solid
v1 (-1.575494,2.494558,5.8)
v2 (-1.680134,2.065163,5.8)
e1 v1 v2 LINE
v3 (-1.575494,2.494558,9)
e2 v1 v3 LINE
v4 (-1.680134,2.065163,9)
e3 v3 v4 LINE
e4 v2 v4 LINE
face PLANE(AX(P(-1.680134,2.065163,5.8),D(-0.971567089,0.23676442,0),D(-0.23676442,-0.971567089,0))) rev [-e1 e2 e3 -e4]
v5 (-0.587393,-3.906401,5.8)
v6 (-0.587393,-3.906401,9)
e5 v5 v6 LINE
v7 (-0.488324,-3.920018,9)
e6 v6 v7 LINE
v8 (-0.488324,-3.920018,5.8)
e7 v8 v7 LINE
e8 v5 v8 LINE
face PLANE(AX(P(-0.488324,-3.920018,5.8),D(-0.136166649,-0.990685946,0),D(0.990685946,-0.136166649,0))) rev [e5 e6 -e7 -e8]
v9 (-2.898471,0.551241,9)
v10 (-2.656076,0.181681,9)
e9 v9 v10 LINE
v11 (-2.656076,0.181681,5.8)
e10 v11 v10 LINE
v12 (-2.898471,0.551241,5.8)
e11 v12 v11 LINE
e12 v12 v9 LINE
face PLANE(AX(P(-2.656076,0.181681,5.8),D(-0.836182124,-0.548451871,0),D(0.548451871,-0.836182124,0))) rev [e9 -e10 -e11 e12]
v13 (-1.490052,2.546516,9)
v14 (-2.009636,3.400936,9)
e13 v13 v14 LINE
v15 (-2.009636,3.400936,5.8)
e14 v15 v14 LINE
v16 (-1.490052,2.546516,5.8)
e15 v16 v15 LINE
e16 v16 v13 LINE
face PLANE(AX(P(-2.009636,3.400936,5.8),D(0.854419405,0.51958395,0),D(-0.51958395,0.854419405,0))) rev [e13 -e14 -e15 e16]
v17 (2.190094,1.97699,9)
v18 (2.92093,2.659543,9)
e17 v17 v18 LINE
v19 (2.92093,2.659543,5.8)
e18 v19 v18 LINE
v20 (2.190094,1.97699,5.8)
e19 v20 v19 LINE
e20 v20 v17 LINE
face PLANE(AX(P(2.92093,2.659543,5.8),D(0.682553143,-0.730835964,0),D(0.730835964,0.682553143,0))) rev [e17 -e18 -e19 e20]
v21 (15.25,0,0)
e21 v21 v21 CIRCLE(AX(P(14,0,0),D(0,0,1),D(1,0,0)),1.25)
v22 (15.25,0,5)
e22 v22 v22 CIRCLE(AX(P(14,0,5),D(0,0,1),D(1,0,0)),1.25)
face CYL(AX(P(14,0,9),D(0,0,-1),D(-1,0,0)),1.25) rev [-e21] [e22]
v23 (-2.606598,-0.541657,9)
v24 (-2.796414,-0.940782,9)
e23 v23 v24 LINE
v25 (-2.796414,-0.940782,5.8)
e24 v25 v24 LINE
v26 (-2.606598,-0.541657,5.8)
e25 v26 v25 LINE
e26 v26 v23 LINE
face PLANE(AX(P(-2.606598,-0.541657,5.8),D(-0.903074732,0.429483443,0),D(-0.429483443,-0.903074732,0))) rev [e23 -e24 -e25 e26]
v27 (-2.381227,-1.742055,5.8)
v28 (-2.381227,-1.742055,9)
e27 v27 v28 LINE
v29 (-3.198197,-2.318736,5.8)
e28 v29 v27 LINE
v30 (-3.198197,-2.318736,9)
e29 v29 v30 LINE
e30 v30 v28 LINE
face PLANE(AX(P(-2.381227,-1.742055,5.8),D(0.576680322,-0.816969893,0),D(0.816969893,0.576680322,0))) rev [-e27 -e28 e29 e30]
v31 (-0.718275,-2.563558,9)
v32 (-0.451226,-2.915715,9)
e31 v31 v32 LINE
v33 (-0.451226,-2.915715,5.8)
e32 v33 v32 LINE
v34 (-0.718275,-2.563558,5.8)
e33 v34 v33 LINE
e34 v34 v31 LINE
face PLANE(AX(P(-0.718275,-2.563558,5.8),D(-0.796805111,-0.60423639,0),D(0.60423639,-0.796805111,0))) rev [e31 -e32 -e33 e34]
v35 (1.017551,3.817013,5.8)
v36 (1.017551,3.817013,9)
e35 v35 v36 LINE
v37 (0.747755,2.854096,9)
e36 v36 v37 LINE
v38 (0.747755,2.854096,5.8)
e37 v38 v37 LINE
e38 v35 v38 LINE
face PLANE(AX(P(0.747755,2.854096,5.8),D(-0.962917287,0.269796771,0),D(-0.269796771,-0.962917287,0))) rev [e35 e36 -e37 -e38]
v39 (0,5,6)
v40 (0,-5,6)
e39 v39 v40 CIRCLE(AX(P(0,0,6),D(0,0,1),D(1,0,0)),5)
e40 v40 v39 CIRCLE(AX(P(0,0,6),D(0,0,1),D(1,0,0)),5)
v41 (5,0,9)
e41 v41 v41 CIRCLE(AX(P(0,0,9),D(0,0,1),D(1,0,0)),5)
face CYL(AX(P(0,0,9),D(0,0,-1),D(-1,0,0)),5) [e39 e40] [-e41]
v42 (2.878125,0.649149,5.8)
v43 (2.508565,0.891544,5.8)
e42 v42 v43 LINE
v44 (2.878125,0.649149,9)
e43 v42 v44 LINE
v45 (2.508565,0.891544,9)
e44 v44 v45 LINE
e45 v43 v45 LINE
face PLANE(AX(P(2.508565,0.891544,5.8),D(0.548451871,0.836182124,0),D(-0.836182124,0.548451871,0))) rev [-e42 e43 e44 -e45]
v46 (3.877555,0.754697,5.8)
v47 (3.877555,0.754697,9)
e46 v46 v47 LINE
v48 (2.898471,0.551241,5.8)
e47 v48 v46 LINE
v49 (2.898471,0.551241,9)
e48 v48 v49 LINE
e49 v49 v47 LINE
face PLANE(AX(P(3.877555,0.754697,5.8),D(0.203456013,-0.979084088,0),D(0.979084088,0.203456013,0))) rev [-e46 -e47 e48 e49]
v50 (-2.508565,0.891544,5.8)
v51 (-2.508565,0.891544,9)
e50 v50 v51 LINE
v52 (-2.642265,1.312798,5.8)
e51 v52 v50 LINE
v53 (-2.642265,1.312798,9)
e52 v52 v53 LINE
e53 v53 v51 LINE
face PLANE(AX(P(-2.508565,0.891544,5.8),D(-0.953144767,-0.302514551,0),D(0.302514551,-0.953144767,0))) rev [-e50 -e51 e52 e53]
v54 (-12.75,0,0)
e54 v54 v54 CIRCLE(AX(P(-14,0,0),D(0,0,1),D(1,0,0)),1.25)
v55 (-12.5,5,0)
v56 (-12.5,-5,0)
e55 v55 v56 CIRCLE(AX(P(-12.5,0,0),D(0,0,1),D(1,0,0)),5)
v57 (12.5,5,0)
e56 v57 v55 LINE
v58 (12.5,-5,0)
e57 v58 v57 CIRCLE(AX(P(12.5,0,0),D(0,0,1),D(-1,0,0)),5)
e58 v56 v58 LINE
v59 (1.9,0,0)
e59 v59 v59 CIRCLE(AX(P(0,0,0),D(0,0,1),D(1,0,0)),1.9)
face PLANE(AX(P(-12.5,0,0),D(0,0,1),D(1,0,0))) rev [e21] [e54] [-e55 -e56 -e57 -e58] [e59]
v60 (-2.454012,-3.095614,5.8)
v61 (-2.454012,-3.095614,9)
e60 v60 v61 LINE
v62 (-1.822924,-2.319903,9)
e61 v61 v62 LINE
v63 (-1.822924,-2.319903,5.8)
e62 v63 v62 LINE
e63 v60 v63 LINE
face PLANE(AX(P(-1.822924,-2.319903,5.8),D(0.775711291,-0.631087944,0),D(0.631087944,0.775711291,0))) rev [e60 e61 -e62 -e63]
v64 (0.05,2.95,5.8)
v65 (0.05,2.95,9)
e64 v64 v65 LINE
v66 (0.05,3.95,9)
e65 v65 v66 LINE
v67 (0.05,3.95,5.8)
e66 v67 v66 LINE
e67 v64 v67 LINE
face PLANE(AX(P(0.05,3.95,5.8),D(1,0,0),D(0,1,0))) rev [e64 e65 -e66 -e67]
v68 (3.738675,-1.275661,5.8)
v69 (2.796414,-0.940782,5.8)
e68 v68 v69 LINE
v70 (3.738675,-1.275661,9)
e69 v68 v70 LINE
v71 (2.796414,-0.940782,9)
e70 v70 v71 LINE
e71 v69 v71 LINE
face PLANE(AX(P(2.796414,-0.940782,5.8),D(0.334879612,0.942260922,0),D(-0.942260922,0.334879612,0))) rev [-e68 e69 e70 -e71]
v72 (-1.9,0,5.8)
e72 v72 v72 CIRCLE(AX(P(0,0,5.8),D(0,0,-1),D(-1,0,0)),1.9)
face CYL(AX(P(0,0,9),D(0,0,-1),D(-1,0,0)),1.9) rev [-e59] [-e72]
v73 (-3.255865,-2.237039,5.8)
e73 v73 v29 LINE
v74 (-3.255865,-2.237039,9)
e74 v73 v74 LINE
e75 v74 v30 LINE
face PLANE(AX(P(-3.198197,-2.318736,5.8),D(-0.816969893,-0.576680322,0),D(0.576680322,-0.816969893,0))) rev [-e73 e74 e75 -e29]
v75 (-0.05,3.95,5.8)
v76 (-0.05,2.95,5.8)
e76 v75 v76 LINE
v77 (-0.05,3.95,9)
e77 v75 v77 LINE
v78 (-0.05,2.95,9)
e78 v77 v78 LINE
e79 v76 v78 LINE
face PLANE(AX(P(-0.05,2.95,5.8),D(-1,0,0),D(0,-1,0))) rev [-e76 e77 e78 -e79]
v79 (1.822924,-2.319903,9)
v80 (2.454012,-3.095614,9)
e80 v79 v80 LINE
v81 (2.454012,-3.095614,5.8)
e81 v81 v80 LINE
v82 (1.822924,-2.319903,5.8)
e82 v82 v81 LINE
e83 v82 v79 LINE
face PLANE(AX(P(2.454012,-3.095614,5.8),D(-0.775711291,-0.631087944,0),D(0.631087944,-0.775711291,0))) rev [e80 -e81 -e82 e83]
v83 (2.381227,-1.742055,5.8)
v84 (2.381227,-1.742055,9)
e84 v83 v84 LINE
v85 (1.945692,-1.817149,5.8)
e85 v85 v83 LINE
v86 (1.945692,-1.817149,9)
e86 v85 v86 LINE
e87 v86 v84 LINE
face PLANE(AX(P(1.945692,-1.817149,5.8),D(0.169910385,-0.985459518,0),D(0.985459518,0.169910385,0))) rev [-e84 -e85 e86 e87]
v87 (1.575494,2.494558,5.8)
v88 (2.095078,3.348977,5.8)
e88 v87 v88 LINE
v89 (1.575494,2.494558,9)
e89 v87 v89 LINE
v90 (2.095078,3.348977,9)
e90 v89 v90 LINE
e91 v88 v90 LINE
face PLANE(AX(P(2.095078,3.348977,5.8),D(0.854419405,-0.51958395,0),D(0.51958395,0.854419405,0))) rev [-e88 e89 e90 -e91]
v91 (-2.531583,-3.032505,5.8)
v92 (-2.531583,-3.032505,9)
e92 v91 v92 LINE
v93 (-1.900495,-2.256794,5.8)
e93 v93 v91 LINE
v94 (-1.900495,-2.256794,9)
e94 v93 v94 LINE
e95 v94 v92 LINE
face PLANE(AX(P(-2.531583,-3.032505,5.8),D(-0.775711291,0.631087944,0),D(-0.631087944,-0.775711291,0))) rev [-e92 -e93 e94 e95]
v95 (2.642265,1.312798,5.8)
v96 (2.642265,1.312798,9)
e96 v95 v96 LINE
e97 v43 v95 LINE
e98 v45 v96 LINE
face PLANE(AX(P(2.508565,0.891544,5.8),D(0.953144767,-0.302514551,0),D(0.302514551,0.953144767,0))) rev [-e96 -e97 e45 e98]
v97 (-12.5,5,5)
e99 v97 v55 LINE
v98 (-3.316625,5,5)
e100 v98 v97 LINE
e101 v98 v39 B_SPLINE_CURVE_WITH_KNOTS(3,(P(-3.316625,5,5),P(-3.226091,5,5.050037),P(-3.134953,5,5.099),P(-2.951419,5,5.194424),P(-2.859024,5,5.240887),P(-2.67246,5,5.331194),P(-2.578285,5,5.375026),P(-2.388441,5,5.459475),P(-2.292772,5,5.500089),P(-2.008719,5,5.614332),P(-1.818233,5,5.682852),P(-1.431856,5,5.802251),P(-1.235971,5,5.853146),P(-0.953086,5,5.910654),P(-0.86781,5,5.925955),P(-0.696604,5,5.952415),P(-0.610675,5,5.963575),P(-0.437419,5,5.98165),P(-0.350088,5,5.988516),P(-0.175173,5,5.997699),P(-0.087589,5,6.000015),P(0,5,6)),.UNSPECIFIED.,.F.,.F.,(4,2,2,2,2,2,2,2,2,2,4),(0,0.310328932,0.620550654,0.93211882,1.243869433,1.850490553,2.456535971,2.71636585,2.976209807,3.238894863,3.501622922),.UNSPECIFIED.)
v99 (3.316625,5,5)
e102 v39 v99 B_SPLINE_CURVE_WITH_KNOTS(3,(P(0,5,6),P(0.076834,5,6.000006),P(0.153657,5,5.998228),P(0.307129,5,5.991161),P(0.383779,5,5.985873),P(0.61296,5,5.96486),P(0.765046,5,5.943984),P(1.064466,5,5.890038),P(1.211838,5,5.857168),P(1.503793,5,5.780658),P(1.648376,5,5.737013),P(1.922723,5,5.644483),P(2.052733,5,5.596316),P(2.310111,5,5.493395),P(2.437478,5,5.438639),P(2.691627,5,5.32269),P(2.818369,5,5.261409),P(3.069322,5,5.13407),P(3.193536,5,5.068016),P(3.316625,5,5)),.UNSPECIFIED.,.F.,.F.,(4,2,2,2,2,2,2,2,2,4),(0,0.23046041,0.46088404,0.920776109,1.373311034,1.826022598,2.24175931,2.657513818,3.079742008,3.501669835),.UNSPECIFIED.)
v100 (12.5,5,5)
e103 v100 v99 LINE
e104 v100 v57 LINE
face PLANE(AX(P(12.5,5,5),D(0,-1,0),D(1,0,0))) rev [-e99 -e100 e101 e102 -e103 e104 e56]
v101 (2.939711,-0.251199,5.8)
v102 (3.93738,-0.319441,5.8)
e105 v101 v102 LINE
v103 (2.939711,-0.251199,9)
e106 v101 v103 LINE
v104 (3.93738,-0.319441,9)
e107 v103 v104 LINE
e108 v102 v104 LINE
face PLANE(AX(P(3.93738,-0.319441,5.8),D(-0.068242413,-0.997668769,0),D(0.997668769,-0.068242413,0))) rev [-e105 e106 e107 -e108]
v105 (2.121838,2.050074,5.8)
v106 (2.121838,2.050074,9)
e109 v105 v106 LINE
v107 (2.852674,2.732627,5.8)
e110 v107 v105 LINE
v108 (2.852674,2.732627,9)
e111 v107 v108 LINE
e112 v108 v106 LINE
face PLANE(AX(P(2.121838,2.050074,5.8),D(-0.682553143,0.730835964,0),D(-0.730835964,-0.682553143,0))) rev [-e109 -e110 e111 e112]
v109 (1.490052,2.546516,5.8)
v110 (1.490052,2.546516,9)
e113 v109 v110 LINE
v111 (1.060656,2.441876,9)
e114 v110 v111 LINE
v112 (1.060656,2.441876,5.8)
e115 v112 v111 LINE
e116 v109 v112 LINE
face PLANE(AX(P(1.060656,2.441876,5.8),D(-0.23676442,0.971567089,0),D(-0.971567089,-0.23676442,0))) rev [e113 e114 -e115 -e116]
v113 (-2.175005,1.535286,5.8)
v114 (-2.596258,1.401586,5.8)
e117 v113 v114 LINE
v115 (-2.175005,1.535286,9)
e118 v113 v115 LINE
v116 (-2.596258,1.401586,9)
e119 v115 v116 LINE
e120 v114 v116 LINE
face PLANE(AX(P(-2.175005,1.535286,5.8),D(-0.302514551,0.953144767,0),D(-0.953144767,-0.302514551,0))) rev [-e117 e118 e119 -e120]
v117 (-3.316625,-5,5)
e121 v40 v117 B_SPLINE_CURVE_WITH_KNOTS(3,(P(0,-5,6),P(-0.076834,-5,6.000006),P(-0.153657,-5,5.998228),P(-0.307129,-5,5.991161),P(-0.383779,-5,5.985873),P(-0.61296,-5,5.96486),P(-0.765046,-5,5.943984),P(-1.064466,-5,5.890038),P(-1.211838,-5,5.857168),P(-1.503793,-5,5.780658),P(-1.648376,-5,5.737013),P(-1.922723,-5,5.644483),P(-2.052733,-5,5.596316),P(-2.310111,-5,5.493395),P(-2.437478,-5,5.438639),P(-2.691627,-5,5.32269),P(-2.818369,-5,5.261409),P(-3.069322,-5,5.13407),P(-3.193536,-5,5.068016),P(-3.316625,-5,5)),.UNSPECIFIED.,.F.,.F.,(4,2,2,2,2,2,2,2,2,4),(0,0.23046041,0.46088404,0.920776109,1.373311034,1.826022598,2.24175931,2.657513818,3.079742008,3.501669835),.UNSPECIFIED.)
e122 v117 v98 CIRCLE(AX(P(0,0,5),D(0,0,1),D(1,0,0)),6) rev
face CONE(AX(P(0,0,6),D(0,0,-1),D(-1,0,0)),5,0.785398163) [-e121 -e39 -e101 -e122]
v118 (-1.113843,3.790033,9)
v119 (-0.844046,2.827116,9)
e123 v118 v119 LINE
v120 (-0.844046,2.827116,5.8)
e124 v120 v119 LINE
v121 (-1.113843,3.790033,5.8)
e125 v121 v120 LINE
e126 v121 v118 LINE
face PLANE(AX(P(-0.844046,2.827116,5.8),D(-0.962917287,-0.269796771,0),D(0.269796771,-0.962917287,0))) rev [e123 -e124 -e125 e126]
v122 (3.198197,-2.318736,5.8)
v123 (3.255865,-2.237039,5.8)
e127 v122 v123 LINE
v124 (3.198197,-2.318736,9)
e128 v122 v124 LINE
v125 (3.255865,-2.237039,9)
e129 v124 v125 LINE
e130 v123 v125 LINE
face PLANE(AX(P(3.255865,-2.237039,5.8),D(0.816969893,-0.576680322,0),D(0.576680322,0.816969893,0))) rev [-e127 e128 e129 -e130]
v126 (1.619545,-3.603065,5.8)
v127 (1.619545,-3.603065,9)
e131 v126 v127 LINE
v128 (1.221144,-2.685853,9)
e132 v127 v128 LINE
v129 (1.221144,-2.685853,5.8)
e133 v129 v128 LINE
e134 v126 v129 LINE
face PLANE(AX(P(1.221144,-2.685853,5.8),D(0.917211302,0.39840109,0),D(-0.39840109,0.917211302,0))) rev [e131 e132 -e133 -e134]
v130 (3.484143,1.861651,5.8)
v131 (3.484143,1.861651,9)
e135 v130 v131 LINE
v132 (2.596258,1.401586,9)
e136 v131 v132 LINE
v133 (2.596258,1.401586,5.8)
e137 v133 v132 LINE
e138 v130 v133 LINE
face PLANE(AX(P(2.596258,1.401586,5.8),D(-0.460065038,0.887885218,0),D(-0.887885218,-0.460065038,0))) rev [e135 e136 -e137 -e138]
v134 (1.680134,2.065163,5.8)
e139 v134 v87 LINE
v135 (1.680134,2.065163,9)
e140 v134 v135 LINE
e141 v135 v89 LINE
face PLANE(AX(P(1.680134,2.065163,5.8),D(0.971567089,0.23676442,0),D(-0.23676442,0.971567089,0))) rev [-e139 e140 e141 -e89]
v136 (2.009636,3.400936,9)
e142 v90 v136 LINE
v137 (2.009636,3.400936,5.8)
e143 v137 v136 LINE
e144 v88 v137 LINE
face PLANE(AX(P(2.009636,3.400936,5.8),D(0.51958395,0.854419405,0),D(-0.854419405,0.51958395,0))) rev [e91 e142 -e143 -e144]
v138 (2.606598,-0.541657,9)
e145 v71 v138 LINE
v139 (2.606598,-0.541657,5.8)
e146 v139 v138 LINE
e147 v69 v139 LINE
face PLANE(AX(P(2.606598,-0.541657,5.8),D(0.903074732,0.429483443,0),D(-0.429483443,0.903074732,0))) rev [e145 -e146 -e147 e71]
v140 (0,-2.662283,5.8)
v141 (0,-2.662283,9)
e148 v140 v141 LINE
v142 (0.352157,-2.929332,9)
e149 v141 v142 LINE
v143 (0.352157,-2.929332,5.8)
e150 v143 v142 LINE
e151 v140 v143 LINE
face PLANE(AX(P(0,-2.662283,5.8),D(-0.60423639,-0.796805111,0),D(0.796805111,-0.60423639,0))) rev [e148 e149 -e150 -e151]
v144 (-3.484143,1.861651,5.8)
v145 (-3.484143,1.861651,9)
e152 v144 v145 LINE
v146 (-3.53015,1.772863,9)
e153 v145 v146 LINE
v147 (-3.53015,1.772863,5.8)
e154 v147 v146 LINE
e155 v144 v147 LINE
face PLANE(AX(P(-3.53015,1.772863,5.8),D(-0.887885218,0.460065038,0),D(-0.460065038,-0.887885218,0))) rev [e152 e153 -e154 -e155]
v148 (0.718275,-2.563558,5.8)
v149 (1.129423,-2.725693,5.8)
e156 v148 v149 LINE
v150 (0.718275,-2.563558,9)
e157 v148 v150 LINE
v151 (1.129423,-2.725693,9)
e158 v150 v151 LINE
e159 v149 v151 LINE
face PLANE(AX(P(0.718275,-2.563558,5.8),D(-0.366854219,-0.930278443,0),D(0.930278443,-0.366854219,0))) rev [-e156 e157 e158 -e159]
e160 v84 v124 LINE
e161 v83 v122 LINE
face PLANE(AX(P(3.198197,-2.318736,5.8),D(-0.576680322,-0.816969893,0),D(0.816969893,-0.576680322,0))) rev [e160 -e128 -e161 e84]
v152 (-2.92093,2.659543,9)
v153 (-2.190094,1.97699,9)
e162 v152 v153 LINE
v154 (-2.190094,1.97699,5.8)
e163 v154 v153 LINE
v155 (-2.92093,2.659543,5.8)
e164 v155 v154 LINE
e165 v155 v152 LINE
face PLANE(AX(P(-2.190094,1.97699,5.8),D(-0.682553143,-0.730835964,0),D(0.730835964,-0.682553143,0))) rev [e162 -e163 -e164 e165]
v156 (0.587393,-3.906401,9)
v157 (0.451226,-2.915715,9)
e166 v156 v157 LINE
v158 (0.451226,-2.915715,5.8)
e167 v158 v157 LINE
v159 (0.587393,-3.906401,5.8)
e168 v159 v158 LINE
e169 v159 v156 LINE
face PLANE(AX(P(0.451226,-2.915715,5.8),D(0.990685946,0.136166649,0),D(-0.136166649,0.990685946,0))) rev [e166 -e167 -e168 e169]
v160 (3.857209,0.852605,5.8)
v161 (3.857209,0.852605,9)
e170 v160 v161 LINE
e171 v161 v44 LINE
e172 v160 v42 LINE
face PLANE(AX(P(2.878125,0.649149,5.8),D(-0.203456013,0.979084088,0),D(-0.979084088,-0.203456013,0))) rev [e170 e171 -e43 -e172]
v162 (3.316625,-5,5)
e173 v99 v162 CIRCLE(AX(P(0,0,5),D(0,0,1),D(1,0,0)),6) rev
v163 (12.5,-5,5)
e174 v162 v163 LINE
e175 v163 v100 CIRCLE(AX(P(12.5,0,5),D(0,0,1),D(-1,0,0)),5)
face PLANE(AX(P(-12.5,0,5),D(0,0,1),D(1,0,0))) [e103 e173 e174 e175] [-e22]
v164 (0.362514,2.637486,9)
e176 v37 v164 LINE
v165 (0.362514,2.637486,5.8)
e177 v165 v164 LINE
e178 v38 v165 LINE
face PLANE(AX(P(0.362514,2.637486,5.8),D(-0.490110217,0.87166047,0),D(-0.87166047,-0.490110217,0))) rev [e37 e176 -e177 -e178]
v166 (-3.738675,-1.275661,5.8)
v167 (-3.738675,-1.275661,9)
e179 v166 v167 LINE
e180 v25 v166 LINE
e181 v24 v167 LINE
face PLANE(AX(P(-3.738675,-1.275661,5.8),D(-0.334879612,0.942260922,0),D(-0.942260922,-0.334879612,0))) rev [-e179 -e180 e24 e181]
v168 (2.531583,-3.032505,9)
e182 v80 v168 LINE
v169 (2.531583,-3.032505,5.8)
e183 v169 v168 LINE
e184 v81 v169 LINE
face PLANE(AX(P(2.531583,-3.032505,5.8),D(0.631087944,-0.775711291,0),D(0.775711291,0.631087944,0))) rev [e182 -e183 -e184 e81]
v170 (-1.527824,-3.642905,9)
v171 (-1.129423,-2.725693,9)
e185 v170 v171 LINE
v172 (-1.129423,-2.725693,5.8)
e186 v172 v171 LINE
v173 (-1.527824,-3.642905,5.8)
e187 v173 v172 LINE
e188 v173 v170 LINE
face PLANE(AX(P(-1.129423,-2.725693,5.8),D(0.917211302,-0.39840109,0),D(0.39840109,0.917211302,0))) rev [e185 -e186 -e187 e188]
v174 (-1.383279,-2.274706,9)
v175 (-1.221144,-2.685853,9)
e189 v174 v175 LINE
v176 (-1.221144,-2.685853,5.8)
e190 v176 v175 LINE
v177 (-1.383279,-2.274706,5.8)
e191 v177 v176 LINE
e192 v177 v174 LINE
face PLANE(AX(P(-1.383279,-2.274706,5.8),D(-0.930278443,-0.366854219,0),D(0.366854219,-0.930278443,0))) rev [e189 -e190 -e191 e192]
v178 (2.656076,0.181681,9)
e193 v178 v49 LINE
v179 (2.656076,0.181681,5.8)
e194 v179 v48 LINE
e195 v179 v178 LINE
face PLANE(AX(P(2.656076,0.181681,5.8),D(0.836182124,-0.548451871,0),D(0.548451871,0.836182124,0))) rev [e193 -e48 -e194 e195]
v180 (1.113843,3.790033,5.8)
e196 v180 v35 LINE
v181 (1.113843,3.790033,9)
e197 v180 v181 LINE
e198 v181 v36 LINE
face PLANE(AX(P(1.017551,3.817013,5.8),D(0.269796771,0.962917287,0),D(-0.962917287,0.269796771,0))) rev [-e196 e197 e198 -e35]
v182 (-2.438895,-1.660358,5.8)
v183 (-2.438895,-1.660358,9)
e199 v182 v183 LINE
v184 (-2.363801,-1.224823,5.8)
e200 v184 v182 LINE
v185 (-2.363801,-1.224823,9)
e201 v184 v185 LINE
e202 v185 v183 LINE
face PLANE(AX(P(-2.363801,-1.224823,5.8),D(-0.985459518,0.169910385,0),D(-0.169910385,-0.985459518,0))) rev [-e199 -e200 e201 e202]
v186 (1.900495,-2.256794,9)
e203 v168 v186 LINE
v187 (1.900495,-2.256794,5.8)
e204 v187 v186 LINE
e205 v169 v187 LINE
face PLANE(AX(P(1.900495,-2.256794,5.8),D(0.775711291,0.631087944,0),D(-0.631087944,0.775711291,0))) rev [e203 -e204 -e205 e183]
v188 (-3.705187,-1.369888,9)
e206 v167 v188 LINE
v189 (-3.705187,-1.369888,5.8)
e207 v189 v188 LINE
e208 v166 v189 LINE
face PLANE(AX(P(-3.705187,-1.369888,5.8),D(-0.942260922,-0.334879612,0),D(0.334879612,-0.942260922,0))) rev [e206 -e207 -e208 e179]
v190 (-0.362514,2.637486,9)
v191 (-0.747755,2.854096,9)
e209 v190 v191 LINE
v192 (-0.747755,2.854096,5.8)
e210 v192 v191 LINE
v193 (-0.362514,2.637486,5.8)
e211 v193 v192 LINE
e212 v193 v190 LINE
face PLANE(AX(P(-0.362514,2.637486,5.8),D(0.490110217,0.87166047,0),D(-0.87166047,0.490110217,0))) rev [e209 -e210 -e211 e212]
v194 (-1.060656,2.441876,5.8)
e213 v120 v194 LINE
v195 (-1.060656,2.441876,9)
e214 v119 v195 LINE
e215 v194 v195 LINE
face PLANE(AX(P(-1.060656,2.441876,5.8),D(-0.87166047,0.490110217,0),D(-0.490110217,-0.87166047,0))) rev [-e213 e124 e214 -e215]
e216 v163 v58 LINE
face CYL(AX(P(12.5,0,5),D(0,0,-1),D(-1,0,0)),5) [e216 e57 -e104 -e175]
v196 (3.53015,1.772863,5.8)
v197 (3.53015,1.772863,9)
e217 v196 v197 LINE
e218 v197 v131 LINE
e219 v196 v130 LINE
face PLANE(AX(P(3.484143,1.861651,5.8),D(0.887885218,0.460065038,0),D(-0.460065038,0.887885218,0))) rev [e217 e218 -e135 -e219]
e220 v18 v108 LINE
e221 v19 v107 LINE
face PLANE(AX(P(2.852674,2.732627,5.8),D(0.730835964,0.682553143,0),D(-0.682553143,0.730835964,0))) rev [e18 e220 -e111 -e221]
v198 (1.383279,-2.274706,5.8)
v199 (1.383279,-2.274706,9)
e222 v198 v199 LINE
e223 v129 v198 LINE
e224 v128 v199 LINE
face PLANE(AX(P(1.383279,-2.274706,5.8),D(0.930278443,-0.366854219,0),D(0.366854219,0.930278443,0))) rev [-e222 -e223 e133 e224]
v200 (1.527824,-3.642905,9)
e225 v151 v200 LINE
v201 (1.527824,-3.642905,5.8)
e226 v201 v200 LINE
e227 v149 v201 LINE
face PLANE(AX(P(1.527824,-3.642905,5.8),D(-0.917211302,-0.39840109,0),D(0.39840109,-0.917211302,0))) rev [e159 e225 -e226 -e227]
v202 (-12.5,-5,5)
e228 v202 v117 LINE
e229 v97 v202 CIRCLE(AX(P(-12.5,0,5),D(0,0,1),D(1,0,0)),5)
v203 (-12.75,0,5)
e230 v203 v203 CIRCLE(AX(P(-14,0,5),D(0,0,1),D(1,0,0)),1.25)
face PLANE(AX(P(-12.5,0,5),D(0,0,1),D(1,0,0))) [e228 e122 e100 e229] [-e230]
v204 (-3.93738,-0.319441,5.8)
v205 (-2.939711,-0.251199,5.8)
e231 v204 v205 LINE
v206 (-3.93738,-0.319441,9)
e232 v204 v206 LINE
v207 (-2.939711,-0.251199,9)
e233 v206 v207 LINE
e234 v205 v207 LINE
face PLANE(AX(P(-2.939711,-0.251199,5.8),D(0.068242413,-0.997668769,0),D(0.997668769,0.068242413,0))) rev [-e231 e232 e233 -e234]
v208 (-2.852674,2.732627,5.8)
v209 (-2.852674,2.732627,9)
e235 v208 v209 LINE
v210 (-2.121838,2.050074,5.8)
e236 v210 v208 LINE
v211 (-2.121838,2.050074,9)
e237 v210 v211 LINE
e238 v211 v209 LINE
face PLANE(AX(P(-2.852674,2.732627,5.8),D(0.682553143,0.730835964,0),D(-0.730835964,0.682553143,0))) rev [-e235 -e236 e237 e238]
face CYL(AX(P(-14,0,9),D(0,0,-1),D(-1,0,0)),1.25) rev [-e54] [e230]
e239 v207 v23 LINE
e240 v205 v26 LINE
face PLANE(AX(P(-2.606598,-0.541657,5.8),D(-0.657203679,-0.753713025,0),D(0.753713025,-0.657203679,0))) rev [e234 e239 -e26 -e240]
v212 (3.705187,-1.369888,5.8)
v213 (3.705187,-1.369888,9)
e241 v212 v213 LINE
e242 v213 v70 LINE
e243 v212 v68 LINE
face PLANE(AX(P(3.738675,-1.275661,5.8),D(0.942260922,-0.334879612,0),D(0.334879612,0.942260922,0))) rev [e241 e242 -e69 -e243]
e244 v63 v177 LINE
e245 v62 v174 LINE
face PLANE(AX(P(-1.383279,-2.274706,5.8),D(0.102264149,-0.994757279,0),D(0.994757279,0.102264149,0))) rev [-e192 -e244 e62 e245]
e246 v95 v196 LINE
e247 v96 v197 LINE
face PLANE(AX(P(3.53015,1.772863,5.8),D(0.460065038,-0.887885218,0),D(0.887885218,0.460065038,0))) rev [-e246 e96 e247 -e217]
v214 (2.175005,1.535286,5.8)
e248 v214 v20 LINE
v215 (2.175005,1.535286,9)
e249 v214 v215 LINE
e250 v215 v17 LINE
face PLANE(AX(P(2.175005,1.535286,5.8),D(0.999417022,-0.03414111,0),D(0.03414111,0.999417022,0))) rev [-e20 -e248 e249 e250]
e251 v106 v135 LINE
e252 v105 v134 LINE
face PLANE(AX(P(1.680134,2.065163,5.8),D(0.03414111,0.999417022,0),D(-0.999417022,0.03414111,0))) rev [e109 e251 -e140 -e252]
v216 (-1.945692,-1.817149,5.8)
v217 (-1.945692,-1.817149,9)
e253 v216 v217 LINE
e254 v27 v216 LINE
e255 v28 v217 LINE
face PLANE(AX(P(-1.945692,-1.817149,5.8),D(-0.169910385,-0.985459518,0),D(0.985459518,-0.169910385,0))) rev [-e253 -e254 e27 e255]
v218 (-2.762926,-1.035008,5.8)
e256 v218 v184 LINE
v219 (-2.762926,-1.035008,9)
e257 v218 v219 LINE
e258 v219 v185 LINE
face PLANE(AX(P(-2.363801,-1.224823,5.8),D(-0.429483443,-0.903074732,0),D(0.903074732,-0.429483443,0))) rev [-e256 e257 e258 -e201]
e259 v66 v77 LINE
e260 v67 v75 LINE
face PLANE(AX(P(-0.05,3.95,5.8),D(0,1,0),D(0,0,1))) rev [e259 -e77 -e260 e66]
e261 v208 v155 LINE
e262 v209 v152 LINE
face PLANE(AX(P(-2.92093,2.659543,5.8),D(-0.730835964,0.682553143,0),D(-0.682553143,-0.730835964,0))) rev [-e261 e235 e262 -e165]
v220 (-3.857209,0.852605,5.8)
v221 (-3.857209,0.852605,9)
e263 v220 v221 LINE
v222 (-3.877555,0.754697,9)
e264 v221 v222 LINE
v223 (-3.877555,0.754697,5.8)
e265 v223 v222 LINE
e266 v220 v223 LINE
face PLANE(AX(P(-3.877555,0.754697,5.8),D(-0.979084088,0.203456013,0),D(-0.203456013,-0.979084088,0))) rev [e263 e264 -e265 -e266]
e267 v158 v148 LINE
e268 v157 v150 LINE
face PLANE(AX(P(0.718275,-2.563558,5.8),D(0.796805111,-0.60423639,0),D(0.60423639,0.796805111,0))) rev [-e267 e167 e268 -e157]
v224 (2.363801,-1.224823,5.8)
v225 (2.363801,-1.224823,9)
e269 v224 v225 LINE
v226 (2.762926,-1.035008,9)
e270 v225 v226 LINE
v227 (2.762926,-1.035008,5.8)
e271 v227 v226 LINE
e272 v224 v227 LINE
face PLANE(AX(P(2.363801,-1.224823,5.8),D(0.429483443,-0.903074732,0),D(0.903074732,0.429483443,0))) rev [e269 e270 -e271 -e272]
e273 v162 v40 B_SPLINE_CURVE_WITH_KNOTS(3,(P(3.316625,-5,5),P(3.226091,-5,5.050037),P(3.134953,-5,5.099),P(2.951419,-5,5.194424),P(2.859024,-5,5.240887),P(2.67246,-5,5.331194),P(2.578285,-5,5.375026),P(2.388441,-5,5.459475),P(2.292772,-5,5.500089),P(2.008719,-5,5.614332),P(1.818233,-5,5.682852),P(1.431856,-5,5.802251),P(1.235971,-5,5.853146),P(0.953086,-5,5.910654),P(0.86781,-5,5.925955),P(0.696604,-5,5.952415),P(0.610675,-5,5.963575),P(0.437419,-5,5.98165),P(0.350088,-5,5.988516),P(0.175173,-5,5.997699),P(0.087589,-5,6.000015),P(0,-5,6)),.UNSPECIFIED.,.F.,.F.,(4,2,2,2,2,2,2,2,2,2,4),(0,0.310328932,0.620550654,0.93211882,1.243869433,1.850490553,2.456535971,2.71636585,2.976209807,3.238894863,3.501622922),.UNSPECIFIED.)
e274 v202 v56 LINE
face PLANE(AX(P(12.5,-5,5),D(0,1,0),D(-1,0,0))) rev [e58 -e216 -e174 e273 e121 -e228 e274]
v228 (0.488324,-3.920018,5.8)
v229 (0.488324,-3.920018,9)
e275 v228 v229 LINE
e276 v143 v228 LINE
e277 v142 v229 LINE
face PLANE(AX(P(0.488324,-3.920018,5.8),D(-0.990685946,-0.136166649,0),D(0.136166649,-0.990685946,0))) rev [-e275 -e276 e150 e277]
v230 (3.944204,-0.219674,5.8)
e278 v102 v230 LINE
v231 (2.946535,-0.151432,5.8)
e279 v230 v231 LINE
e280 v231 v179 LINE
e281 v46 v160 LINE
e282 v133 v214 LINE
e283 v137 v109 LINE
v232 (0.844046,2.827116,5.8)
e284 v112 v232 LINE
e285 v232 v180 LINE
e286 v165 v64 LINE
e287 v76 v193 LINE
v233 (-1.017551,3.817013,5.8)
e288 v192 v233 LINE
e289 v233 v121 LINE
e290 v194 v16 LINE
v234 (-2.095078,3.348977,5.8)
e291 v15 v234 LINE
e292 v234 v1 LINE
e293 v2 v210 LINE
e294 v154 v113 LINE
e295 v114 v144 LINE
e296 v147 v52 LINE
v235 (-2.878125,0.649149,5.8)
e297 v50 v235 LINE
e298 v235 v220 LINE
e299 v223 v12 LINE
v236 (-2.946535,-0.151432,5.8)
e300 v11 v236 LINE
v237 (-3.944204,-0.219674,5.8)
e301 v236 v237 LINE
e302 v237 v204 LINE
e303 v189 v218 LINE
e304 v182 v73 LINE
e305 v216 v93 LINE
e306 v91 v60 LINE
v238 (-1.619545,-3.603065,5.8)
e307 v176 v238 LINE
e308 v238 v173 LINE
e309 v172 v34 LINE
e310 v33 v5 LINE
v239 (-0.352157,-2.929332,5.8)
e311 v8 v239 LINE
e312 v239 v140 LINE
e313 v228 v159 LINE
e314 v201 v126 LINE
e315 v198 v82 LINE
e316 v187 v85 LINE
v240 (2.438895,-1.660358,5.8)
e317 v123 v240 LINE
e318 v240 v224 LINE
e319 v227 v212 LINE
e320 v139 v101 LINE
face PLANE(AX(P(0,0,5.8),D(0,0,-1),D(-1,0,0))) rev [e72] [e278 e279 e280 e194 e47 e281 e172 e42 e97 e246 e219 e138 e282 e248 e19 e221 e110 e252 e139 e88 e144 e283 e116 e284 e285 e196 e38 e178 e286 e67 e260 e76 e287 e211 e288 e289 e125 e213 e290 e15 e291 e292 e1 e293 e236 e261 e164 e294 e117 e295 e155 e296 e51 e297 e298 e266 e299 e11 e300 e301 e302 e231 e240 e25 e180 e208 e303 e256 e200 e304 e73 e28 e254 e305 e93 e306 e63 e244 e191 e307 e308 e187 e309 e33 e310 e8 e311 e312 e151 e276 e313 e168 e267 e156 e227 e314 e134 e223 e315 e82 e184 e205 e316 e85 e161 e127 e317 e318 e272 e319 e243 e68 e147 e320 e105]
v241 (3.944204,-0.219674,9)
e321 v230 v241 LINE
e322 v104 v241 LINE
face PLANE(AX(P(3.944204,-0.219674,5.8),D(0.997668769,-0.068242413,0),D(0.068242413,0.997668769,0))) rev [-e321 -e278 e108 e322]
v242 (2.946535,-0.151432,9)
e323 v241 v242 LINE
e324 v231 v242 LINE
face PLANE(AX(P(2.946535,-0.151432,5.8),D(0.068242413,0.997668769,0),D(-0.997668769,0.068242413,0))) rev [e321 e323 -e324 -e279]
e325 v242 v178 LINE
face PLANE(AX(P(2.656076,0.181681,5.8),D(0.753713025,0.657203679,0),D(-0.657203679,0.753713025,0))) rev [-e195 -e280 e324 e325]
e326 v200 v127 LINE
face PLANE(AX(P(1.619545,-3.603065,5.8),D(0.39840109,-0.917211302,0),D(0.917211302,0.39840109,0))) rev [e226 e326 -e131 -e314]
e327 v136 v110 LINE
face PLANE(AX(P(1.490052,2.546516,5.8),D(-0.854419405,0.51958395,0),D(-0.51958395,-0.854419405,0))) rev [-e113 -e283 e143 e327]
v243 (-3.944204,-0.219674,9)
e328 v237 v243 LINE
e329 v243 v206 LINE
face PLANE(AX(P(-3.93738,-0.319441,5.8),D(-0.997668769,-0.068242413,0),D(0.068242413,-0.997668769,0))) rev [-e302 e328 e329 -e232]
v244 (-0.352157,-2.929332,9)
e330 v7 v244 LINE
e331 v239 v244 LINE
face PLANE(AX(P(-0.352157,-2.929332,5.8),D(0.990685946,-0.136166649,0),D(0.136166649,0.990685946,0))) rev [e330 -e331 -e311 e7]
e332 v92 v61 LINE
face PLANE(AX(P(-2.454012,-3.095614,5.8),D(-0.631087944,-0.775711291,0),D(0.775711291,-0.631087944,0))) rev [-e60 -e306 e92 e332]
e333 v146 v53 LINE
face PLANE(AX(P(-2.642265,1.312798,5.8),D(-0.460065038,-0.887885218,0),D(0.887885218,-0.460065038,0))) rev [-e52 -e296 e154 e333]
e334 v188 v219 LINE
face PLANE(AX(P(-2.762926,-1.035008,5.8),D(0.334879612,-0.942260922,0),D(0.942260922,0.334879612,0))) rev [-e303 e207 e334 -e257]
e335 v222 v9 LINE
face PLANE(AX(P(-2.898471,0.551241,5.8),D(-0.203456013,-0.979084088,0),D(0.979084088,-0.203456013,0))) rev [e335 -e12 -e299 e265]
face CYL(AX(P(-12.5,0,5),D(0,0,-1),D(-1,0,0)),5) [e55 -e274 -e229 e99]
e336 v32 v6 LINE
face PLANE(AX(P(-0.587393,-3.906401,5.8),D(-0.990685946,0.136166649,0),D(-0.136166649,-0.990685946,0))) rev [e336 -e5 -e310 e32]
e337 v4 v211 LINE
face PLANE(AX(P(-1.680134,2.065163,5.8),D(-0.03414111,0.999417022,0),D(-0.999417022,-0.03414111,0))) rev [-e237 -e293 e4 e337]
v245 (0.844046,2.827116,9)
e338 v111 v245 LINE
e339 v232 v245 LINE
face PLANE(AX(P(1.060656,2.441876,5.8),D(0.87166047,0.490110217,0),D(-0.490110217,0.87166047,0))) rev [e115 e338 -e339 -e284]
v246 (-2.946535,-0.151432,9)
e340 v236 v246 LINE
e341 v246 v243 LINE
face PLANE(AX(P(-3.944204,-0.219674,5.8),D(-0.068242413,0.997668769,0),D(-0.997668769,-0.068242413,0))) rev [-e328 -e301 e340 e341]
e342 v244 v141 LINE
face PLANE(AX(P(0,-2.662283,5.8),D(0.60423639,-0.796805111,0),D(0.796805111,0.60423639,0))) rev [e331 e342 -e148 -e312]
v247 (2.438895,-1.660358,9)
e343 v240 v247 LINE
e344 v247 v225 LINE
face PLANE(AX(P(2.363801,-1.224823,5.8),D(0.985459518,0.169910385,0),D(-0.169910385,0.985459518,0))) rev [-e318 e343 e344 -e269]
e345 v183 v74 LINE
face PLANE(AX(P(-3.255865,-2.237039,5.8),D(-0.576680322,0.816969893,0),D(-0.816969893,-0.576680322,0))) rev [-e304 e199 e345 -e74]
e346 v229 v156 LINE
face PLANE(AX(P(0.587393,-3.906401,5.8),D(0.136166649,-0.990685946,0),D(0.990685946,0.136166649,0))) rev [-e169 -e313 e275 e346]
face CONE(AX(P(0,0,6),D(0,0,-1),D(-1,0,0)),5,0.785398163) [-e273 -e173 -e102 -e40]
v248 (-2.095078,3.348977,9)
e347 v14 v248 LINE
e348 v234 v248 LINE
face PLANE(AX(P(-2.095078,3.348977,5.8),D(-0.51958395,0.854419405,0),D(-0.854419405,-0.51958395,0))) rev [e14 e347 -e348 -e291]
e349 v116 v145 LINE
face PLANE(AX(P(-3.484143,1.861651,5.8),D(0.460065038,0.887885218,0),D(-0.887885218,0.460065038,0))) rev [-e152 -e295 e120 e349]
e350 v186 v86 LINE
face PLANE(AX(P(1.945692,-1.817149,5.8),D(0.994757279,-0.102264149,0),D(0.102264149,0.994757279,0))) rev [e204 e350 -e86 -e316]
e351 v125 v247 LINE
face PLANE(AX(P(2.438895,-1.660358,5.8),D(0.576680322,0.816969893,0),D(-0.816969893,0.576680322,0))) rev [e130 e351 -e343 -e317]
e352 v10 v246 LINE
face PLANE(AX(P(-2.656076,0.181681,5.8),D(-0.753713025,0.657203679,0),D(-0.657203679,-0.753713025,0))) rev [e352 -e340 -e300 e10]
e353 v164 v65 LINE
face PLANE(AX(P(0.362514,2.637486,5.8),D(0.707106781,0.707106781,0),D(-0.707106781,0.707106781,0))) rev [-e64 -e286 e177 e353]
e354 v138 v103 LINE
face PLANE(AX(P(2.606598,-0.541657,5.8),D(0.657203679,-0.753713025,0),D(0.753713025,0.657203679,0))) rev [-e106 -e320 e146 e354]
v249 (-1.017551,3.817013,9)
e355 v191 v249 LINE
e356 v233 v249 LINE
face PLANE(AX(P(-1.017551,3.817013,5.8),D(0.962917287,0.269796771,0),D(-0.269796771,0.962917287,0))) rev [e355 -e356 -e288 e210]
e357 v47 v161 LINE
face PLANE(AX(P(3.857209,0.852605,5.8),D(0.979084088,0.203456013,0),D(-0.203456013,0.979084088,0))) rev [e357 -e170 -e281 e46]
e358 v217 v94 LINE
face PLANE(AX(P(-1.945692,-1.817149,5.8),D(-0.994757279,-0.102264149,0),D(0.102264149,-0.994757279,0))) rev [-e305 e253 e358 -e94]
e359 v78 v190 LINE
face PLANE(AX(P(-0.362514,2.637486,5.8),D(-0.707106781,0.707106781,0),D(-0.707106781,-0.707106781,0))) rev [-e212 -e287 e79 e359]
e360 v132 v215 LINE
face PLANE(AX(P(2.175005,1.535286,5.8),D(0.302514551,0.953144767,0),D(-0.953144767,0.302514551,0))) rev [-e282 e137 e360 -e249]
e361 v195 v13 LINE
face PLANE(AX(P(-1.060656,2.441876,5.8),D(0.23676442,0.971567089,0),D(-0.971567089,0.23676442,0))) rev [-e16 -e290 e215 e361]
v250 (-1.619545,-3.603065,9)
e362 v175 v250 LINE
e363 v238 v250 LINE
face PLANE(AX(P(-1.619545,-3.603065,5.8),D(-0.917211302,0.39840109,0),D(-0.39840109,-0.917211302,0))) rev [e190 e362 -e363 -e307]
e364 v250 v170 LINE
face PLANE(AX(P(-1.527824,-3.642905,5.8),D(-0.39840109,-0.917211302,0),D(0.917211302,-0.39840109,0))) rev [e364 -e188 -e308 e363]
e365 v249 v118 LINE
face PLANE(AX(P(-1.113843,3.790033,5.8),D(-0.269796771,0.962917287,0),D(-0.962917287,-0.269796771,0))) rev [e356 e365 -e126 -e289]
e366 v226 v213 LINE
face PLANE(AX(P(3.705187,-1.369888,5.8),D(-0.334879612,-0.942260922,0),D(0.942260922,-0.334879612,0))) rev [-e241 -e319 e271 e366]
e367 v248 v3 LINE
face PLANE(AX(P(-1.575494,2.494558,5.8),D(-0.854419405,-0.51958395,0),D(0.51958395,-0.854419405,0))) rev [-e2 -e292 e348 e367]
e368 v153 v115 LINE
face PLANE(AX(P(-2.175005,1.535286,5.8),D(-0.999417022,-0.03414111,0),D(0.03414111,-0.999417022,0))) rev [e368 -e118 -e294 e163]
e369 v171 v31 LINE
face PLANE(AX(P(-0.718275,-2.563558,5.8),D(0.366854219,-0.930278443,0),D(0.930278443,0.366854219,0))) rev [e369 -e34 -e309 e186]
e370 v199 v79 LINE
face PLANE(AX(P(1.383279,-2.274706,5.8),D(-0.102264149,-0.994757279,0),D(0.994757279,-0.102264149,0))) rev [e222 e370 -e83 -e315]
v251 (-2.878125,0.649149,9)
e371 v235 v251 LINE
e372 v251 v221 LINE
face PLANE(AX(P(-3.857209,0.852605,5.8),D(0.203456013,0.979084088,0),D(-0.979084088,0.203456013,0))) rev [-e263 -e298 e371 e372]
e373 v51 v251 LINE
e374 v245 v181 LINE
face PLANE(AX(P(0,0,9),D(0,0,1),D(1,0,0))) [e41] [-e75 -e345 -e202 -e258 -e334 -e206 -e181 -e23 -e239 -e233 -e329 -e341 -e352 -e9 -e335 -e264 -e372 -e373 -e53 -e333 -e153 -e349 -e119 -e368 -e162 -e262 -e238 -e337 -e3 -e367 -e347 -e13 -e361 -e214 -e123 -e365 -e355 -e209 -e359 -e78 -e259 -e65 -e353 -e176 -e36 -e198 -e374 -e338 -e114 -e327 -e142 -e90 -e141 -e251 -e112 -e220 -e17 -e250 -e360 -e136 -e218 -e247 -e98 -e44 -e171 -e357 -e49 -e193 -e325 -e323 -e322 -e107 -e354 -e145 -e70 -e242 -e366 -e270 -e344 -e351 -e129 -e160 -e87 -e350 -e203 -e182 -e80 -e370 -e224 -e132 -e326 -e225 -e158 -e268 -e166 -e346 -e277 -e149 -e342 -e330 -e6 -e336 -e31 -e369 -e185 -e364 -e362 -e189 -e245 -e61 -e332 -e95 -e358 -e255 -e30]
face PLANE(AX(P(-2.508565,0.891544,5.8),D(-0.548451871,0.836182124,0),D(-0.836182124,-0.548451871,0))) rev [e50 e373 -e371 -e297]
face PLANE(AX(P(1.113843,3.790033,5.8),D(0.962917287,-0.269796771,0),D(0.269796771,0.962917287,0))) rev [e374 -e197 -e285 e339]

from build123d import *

# Parameters (mm, degrees)
EXTRUDE_1_DEPTH          = 5
SKETCH_6_R               = 5
EXTRUDE_3_DEPTH          = 4
CUT_EXTRUDE_5_DEPTH      = 3.2
CHAMFER_1_SIZE           = 1
CUT_EXTRUDE_6_DEPTH      = 21.303940504
CUT_EXTRUDE_6_DEPTH_BACK = 21.303940504
SKETCH_7_R               = 1.25
SKETCH_7_R_2             = 1.9


with BuildPart() as part:
    # ｽｹｯﾁ1 → ﾎﾞｽ - 押し出し1 (new body)
    with BuildSketch(Plane.XY):
        with BuildLine():
            Line((12.5, -5), (-12.5, -5))
            ThreePointArc((-12.5, -5), (-17.5, 0), (-12.5, 5))
            Line((-12.5, 5), (12.5, 5))
            ThreePointArc((12.5, 5), (17.5, 0), (12.5, -5))
        make_face()
    extrude(amount=EXTRUDE_1_DEPTH)

    # ｽｹｯﾁ6 → ﾎﾞｽ - 押し出し3 (add)
    with BuildSketch(Plane.XY.offset(5)):
        with Locations(Location((0, 0, 0), (0, 0, 270))):
            Circle(SKETCH_6_R)
    extrude(amount=EXTRUDE_3_DEPTH)

    # ｽｹｯﾁ5 → ｶｯﾄ - 押し出し5 (cut)
    with BuildSketch(Plane.XY.offset(9)):
        Polygon((-0.05, 2.95), (-0.05, 3.95), (0.05, 3.95), (0.05, 2.95), (0.362514094, 2.637485906), (0.747754611, 2.854095836), (1.017551382, 3.817013124), (1.11384311, 3.790033446), (0.844046339, 2.827116159), (1.060656269, 2.441875642), (1.490051682, 2.546516441), (2.009635632, 3.400935845), (2.095077573, 3.34897745), (1.575493623, 2.494558046), (1.680134421, 2.065162633), (2.121838437, 2.050073571), (2.852674402, 2.732626714), (2.920929716, 2.659543117), (2.190093752, 1.976989974), (2.17500469, 1.535285958), (2.596258142, 1.401586122), (3.484143361, 1.86165116), (3.530149865, 1.772862638), (2.642264646, 1.3127976), (2.50856481, 0.891544148), (2.878125258, 0.649149443), (3.857209346, 0.852605456), (3.877554947, 0.754697047), (2.898470859, 0.551241034), (2.656076155, 0.181680586), (2.94653499, -0.151431681), (3.944203759, -0.219674094), (3.937379518, -0.319440971), (2.939710748, -0.251198558), (2.606598481, -0.541657393), (2.796413701, -0.94078181), (3.738674623, -1.275661422), (3.705186662, -1.369887514), (2.76292574, -1.035007902), (2.363801323, -1.224823122), (2.4388952, -1.660358456), (3.255865093, -2.237038778), (3.198197061, -2.318735767), (2.381227168, -1.742055445), (1.945691834, -1.817149322), (1.900495, -2.25679391), (2.531582945, -3.032505201), (2.454011816, -3.095613995), (1.822923871, -2.319902705), (1.383279283, -2.274705871), (1.22114378, -2.685853285), (1.61954487, -3.603064586), (1.52782374, -3.642904695), (1.12942265, -2.725693394), (0.718275236, -2.563557891), (0.451225912, -2.915715208), (0.587392561, -3.906401154), (0.488323967, -3.920017819), (0.352157318, -2.929331873), (0, -2.66228255), (-0.352157318, -2.929331873), (-0.488323967, -3.920017819), (-0.587392561, -3.906401154), (-0.451225912, -2.915715208), (-0.718275236, -2.563557891), (-1.12942265, -2.725693394), (-1.52782374, -3.642904695), (-1.61954487, -3.603064586), (-1.22114378, -2.685853285), (-1.383279283, -2.274705871), (-1.822923871, -2.319902705), (-2.454011816, -3.095613995), (-2.531582945, -3.032505201), (-1.900495, -2.25679391), (-1.945691834, -1.817149322), (-2.381227168, -1.742055445), (-3.198197061, -2.318735767), (-3.255865093, -2.237038778), (-2.4388952, -1.660358456), (-2.363801323, -1.224823122), (-2.76292574, -1.035007902), (-3.705186662, -1.369887514), (-3.738674623, -1.275661422), (-2.796413701, -0.94078181), (-2.606598481, -0.541657393), (-2.939710748, -0.251198558), (-3.937379518, -0.319440971), (-3.944203759, -0.219674094), (-2.94653499, -0.151431681), (-2.656076155, 0.181680586), (-2.898470859, 0.551241034), (-3.877554947, 0.754697047), (-3.857209346, 0.852605456), (-2.878125258, 0.649149443), (-2.50856481, 0.891544148), (-2.642264646, 1.3127976), (-3.530149865, 1.772862638), (-3.484143361, 1.86165116), (-2.596258142, 1.401586122), (-2.17500469, 1.535285958), (-2.190093752, 1.976989974), (-2.920929716, 2.659543117), (-2.852674402, 2.732626714), (-2.121838437, 2.050073571), (-1.680134421, 2.065162633), (-1.575493623, 2.494558046), (-2.095077573, 3.34897745), (-2.009635632, 3.400935845), (-1.490051682, 2.546516441), (-1.060656269, 2.441875642), (-0.844046339, 2.827116159), (-1.11384311, 3.790033446), (-1.017551382, 3.817013124), (-0.747754611, 2.854095836), (-0.362514094, 2.637485906), align=None)
    extrude(amount=-CUT_EXTRUDE_5_DEPTH, mode=Mode.SUBTRACT)

    # 面取り1
    # the kernel refuses this chamfer: 1 mm, written as the material it adds along each edge
    with BuildSketch(Plane(origin=(0, 0, 5), x_dir=(0, -1, 0), z_dir=(-1, 0, 0))) as chamfer_1_piece_1_section:
        Polygon((5 + CHAMFER_1_SIZE, 0), (5, CHAMFER_1_SIZE), (5, 0), align=None)
    chamfer_1_piece_1 = revolve(axis=Axis((0, 0, 5), (0, 0, 1)), revolution_arc=180, mode=Mode.PRIVATE)
    chamfer_1_piece_1 = split(chamfer_1_piece_1, bisect_by=Plane(origin=(5.48673026, -5, 5.48673026), z_dir=(0, 1, 0)), keep=Keep.TOP, mode=Mode.PRIVATE)
    chamfer_1_piece_1 = split(chamfer_1_piece_1, bisect_by=Plane(origin=(5.48673026, 5, 5.48673026), z_dir=(0, -1, 0)), keep=Keep.TOP, mode=Mode.PRIVATE)
    add(chamfer_1_piece_1)
    with BuildSketch(Plane(origin=(0, 0, 5), x_dir=(0, 1, 0), z_dir=(1, 0, 0))) as chamfer_1_piece_2_section:
        Polygon((5 + CHAMFER_1_SIZE, 0), (5, CHAMFER_1_SIZE), (5, 0), align=None)
    chamfer_1_piece_2 = revolve(axis=Axis((0, 0, 5), (0, 0, 1)), revolution_arc=180, mode=Mode.PRIVATE)
    chamfer_1_piece_2 = split(chamfer_1_piece_2, bisect_by=Plane(origin=(-5.48673026, -5, 5.48673026), z_dir=(0, 1, 0)), keep=Keep.TOP, mode=Mode.PRIVATE)
    chamfer_1_piece_2 = split(chamfer_1_piece_2, bisect_by=Plane(origin=(-5.48673026, 5, 5.48673026), z_dir=(0, -1, 0)), keep=Keep.TOP, mode=Mode.PRIVATE)
    add(chamfer_1_piece_2)

    # ｽｹｯﾁ7 → ｶｯﾄ - 押し出し6 (cut, two sides: drawn at the far end of the back side and taken through both)
    with BuildSketch(Plane(origin=(0, 0, 0), x_dir=(-1, 0, 0), z_dir=(0, 0, -1)).offset(-CUT_EXTRUDE_6_DEPTH_BACK)):
        with Locations(Location((14, 0, 0), (0, 0, 180))):
            Circle(SKETCH_7_R)
        Circle(SKETCH_7_R_2)
        with Locations(Location((-14, 0, 0), (0, 0, 180))):
            Circle(SKETCH_7_R)
    extrude(amount=CUT_EXTRUDE_6_DEPTH + CUT_EXTRUDE_6_DEPTH_BACK, mode=Mode.SUBTRACT)


solid = part.part
